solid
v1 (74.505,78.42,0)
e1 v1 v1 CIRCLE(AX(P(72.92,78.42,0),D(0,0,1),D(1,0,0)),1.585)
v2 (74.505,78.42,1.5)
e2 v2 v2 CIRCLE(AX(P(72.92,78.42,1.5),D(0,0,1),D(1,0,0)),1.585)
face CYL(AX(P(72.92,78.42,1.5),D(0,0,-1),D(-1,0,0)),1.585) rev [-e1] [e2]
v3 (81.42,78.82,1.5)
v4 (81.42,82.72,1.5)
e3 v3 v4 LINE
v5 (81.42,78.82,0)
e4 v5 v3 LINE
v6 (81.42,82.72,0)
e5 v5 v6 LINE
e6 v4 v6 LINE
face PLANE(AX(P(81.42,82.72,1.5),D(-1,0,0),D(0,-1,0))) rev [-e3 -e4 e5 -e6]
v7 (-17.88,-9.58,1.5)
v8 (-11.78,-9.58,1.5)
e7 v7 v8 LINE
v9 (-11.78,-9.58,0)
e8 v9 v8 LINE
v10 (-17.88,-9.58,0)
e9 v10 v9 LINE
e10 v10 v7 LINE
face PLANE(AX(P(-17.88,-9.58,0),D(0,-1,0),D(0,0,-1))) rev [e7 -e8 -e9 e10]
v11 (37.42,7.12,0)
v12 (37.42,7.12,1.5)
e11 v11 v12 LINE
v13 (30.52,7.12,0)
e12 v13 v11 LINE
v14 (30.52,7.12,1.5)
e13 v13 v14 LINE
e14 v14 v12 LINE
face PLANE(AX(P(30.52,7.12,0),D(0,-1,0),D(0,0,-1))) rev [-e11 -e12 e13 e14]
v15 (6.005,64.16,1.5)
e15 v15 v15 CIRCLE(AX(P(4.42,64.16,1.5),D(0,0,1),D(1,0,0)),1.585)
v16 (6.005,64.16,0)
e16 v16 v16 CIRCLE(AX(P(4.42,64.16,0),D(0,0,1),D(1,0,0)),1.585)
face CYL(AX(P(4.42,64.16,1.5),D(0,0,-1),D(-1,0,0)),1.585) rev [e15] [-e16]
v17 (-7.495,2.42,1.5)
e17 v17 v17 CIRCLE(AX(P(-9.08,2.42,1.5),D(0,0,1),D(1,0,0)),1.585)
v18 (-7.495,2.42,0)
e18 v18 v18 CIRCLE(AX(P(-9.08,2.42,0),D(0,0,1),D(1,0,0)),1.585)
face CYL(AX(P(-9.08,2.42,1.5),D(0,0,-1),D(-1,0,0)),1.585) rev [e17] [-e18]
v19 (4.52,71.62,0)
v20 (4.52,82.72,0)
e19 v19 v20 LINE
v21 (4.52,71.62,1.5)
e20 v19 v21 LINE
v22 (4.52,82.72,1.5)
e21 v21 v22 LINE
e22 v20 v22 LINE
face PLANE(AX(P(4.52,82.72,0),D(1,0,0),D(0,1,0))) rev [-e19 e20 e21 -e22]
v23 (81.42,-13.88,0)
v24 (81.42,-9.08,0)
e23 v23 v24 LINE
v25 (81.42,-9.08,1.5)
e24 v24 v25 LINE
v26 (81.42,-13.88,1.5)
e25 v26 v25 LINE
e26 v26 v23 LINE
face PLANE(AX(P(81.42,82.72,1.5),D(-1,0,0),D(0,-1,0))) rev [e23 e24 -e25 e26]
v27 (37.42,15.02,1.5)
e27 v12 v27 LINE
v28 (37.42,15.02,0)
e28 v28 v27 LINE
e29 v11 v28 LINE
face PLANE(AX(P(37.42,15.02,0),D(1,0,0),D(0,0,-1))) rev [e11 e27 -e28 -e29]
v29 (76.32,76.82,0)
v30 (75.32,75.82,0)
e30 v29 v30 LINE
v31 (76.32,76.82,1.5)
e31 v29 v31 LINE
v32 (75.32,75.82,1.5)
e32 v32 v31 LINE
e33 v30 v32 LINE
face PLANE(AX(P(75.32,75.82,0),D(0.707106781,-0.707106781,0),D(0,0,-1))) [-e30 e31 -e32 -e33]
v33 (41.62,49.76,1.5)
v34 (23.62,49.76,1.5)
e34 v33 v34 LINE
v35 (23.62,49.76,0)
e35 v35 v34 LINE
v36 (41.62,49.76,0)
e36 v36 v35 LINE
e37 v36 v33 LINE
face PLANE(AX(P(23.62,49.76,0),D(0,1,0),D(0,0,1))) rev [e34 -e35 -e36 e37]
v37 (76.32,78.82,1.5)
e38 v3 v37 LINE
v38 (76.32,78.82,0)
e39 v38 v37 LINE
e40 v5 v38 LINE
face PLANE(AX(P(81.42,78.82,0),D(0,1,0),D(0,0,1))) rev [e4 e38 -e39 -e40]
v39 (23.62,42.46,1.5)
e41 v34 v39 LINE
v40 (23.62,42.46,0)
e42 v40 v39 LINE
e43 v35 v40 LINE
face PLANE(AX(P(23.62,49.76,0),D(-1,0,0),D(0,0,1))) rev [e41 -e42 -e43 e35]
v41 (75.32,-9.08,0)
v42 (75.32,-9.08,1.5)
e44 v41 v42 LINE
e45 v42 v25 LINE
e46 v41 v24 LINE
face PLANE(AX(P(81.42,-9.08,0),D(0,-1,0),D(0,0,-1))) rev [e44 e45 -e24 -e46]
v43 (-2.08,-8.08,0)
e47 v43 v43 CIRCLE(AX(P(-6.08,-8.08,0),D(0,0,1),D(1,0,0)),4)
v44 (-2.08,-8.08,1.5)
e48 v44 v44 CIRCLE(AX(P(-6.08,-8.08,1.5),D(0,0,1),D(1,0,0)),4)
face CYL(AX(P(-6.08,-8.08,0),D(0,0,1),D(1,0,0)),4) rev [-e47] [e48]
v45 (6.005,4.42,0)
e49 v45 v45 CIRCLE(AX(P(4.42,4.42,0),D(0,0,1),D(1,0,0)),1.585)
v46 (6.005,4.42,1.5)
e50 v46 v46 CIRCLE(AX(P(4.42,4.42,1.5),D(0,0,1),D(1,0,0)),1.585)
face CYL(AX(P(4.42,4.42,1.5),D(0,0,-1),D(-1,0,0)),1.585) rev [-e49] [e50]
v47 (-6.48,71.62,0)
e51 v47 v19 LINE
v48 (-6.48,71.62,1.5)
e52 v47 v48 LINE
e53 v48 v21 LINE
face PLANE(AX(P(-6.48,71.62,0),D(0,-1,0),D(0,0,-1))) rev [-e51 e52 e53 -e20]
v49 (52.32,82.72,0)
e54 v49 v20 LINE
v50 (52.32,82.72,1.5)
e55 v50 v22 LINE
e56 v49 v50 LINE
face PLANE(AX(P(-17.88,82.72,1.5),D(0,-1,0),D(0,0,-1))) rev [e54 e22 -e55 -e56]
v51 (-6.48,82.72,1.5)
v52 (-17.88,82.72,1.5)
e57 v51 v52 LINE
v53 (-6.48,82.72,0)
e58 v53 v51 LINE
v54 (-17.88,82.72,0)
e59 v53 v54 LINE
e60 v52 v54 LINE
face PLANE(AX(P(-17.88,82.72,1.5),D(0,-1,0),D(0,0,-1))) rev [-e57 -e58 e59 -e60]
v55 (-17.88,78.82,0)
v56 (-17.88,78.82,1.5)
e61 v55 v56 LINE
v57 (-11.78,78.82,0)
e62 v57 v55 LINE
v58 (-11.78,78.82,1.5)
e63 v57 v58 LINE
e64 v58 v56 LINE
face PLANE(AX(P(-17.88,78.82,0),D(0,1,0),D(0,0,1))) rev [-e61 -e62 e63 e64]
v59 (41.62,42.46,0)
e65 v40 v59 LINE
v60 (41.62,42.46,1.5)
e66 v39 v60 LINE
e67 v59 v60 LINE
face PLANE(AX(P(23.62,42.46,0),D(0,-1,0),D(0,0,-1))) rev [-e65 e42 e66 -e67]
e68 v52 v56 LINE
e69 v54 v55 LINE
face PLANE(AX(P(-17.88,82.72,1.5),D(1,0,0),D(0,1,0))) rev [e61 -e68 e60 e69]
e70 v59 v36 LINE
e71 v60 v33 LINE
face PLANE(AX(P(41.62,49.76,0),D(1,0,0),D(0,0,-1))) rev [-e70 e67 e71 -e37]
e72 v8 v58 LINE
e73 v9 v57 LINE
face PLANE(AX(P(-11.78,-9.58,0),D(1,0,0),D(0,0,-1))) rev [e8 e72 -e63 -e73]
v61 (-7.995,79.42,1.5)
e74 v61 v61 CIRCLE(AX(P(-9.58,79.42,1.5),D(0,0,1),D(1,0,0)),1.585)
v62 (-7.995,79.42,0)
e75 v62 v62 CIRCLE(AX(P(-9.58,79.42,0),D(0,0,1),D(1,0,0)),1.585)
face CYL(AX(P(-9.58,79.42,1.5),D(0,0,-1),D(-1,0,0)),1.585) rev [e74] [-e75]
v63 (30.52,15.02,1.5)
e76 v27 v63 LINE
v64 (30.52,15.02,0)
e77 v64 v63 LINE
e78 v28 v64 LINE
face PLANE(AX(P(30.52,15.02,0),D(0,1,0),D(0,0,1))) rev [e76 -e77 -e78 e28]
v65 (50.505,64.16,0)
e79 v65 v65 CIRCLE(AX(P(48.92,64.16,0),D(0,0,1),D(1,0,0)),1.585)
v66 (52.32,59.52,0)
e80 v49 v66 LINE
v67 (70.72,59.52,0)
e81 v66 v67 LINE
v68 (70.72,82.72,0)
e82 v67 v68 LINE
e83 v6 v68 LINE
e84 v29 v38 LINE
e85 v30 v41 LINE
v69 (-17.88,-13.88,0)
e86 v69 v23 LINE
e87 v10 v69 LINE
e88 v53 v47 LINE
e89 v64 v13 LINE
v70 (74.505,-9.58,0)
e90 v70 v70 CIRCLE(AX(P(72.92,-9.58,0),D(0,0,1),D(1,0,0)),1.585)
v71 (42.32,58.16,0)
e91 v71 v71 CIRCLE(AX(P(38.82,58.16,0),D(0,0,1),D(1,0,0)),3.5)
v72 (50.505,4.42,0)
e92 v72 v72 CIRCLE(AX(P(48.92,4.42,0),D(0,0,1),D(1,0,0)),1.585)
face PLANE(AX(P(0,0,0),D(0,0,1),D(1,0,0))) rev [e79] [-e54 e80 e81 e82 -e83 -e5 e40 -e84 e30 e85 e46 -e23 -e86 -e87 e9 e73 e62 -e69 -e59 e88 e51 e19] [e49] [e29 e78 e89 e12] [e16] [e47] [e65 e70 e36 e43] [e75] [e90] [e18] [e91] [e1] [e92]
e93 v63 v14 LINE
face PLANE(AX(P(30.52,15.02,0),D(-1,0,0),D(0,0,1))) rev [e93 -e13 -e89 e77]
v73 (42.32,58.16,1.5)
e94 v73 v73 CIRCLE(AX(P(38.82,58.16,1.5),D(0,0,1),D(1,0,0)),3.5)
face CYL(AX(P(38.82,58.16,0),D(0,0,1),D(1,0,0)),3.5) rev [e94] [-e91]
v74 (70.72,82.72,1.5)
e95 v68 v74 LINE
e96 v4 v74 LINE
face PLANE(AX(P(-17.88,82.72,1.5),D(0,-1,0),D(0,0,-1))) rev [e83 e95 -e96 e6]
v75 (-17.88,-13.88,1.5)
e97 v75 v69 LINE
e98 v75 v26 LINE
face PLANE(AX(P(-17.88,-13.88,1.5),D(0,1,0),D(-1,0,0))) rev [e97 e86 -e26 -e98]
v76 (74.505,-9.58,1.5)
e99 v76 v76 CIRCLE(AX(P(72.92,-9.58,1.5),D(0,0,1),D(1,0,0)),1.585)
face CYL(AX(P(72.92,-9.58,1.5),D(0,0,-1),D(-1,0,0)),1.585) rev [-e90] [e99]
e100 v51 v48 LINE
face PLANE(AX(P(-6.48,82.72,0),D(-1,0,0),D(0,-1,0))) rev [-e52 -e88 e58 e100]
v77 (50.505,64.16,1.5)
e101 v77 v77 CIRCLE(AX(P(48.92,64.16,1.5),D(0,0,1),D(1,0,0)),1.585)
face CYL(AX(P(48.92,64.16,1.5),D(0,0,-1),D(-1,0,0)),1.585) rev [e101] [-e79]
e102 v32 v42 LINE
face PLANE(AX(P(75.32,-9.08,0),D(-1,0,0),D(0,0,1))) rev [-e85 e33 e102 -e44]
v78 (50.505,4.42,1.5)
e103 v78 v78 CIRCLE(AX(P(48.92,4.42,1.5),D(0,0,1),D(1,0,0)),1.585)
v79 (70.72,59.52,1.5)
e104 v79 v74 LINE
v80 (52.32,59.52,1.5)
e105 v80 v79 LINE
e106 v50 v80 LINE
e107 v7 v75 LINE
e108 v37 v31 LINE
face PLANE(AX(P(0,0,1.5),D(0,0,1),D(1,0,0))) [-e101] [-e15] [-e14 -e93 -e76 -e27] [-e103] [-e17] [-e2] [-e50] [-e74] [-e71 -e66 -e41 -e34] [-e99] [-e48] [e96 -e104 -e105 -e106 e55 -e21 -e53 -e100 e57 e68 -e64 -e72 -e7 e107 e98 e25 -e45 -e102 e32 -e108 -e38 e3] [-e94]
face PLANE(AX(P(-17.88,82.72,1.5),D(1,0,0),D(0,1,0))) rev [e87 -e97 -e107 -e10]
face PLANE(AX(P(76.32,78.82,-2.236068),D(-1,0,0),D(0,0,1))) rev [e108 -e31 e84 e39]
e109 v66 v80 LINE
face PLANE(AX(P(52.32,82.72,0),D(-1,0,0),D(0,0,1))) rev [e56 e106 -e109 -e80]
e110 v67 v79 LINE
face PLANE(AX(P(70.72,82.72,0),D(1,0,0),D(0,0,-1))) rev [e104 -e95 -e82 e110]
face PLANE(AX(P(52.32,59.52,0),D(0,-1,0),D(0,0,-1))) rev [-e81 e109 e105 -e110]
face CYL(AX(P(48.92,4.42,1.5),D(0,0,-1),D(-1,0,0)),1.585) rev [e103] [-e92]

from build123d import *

# Parameters (mm, degrees)
SKETCH_1_W          = 99.3
SKETCH_1_H          = 96.6
SKETCH_1_R          = 1.585
EXTRUDE_1_DEPTH     = 1.5
SKETCH_2_R          = 3.5
SKETCH_2_R_2        = 4
SKETCH_2_W          = 18.4
SKETCH_2_H          = 23.2
SKETCH_2_W_2        = 18
SKETCH_2_H_2        = 7.3
SKETCH_2_W_3        = 6.1
SKETCH_2_H_3        = 88.4
SKETCH_2_H_4        = 87.9
SKETCH_2_W_4        = 6.9
SKETCH_2_H_5        = 7.9
SKETCH_2_W_5        = 11
SKETCH_2_H_6        = 11.1
CUT_EXTRUDE_1_DEPTH = 117.077839401
SKETCH_3_W          = 1
SKETCH_3_H          = 2
EXTRUDE_2_DEPTH     = 1.5
CHAMFER_1_SIZE      = 1


with BuildPart() as part:
    # 草图1 → 凸台-拉伸1 (new body)
    with BuildSketch(Plane.XY):
        with Locations((31.77, 34.42)):
            Rectangle(SKETCH_1_W, SKETCH_1_H)
        with Locations((48.92, 64.16)):
            Circle(SKETCH_1_R, mode=Mode.SUBTRACT)
        with Locations((4.42, 64.16)):
            Circle(SKETCH_1_R, mode=Mode.SUBTRACT)
        with Locations((4.42, 4.42)):
            Circle(SKETCH_1_R, mode=Mode.SUBTRACT)
        with Locations((48.92, 4.42)):
            Circle(SKETCH_1_R, mode=Mode.SUBTRACT)
        with Locations((-9.08, 2.42)):
            Circle(SKETCH_1_R, mode=Mode.SUBTRACT)
        with Locations((72.92, -9.58)):
            Circle(SKETCH_1_R, mode=Mode.SUBTRACT)
        with Locations((72.92, 78.42)):
            Circle(SKETCH_1_R, mode=Mode.SUBTRACT)
        with Locations((-9.58, 79.42)):
            Circle(SKETCH_1_R, mode=Mode.SUBTRACT)
    extrude(amount=EXTRUDE_1_DEPTH)

    # 草图2 → 切除-拉伸1 (cut, through all)
    with BuildSketch(Plane.XY.offset(1.5)):
        with Locations((38.82, 58.16)):
            Circle(SKETCH_2_R)
        with Locations((-6.08, -8.08)):
            Circle(SKETCH_2_R_2)
        with Locations((61.52, 71.12)):
            Rectangle(SKETCH_2_W, SKETCH_2_H)
        with Locations((32.62, 46.11)):
            Rectangle(SKETCH_2_W_2, SKETCH_2_H_2)
        with Locations((-14.83, 34.62)):
            Rectangle(SKETCH_2_W_3, SKETCH_2_H_3)
        with Locations((78.37, 34.87)):
            Rectangle(SKETCH_2_W_3, SKETCH_2_H_4)
        with Locations((33.97, 11.07)):
            Rectangle(SKETCH_2_W_4, SKETCH_2_H_5)
        with Locations((-0.98, 77.17)):
            Rectangle(SKETCH_2_W_5, SKETCH_2_H_6)
    extrude(amount=-CUT_EXTRUDE_1_DEPTH, mode=Mode.SUBTRACT)

    # 草图3 → 凸台-拉伸2 (add)
    with BuildSketch(Plane.XY.offset(1.5)):
        with Locations((75.82, 77.82)):
            Rectangle(SKETCH_3_W, SKETCH_3_H)
    extrude(amount=-EXTRUDE_2_DEPTH)

    # 倒角1
    chamfer_1_edges = [part.edges().sort_by_distance(p)[0] for p in [
        (75.32, 76.82, 0.75),
    ]]
    chamfer(chamfer_1_edges, length=CHAMFER_1_SIZE - 0.0001)  # a hair under: the kernel refuses the full size


solid = part.part
